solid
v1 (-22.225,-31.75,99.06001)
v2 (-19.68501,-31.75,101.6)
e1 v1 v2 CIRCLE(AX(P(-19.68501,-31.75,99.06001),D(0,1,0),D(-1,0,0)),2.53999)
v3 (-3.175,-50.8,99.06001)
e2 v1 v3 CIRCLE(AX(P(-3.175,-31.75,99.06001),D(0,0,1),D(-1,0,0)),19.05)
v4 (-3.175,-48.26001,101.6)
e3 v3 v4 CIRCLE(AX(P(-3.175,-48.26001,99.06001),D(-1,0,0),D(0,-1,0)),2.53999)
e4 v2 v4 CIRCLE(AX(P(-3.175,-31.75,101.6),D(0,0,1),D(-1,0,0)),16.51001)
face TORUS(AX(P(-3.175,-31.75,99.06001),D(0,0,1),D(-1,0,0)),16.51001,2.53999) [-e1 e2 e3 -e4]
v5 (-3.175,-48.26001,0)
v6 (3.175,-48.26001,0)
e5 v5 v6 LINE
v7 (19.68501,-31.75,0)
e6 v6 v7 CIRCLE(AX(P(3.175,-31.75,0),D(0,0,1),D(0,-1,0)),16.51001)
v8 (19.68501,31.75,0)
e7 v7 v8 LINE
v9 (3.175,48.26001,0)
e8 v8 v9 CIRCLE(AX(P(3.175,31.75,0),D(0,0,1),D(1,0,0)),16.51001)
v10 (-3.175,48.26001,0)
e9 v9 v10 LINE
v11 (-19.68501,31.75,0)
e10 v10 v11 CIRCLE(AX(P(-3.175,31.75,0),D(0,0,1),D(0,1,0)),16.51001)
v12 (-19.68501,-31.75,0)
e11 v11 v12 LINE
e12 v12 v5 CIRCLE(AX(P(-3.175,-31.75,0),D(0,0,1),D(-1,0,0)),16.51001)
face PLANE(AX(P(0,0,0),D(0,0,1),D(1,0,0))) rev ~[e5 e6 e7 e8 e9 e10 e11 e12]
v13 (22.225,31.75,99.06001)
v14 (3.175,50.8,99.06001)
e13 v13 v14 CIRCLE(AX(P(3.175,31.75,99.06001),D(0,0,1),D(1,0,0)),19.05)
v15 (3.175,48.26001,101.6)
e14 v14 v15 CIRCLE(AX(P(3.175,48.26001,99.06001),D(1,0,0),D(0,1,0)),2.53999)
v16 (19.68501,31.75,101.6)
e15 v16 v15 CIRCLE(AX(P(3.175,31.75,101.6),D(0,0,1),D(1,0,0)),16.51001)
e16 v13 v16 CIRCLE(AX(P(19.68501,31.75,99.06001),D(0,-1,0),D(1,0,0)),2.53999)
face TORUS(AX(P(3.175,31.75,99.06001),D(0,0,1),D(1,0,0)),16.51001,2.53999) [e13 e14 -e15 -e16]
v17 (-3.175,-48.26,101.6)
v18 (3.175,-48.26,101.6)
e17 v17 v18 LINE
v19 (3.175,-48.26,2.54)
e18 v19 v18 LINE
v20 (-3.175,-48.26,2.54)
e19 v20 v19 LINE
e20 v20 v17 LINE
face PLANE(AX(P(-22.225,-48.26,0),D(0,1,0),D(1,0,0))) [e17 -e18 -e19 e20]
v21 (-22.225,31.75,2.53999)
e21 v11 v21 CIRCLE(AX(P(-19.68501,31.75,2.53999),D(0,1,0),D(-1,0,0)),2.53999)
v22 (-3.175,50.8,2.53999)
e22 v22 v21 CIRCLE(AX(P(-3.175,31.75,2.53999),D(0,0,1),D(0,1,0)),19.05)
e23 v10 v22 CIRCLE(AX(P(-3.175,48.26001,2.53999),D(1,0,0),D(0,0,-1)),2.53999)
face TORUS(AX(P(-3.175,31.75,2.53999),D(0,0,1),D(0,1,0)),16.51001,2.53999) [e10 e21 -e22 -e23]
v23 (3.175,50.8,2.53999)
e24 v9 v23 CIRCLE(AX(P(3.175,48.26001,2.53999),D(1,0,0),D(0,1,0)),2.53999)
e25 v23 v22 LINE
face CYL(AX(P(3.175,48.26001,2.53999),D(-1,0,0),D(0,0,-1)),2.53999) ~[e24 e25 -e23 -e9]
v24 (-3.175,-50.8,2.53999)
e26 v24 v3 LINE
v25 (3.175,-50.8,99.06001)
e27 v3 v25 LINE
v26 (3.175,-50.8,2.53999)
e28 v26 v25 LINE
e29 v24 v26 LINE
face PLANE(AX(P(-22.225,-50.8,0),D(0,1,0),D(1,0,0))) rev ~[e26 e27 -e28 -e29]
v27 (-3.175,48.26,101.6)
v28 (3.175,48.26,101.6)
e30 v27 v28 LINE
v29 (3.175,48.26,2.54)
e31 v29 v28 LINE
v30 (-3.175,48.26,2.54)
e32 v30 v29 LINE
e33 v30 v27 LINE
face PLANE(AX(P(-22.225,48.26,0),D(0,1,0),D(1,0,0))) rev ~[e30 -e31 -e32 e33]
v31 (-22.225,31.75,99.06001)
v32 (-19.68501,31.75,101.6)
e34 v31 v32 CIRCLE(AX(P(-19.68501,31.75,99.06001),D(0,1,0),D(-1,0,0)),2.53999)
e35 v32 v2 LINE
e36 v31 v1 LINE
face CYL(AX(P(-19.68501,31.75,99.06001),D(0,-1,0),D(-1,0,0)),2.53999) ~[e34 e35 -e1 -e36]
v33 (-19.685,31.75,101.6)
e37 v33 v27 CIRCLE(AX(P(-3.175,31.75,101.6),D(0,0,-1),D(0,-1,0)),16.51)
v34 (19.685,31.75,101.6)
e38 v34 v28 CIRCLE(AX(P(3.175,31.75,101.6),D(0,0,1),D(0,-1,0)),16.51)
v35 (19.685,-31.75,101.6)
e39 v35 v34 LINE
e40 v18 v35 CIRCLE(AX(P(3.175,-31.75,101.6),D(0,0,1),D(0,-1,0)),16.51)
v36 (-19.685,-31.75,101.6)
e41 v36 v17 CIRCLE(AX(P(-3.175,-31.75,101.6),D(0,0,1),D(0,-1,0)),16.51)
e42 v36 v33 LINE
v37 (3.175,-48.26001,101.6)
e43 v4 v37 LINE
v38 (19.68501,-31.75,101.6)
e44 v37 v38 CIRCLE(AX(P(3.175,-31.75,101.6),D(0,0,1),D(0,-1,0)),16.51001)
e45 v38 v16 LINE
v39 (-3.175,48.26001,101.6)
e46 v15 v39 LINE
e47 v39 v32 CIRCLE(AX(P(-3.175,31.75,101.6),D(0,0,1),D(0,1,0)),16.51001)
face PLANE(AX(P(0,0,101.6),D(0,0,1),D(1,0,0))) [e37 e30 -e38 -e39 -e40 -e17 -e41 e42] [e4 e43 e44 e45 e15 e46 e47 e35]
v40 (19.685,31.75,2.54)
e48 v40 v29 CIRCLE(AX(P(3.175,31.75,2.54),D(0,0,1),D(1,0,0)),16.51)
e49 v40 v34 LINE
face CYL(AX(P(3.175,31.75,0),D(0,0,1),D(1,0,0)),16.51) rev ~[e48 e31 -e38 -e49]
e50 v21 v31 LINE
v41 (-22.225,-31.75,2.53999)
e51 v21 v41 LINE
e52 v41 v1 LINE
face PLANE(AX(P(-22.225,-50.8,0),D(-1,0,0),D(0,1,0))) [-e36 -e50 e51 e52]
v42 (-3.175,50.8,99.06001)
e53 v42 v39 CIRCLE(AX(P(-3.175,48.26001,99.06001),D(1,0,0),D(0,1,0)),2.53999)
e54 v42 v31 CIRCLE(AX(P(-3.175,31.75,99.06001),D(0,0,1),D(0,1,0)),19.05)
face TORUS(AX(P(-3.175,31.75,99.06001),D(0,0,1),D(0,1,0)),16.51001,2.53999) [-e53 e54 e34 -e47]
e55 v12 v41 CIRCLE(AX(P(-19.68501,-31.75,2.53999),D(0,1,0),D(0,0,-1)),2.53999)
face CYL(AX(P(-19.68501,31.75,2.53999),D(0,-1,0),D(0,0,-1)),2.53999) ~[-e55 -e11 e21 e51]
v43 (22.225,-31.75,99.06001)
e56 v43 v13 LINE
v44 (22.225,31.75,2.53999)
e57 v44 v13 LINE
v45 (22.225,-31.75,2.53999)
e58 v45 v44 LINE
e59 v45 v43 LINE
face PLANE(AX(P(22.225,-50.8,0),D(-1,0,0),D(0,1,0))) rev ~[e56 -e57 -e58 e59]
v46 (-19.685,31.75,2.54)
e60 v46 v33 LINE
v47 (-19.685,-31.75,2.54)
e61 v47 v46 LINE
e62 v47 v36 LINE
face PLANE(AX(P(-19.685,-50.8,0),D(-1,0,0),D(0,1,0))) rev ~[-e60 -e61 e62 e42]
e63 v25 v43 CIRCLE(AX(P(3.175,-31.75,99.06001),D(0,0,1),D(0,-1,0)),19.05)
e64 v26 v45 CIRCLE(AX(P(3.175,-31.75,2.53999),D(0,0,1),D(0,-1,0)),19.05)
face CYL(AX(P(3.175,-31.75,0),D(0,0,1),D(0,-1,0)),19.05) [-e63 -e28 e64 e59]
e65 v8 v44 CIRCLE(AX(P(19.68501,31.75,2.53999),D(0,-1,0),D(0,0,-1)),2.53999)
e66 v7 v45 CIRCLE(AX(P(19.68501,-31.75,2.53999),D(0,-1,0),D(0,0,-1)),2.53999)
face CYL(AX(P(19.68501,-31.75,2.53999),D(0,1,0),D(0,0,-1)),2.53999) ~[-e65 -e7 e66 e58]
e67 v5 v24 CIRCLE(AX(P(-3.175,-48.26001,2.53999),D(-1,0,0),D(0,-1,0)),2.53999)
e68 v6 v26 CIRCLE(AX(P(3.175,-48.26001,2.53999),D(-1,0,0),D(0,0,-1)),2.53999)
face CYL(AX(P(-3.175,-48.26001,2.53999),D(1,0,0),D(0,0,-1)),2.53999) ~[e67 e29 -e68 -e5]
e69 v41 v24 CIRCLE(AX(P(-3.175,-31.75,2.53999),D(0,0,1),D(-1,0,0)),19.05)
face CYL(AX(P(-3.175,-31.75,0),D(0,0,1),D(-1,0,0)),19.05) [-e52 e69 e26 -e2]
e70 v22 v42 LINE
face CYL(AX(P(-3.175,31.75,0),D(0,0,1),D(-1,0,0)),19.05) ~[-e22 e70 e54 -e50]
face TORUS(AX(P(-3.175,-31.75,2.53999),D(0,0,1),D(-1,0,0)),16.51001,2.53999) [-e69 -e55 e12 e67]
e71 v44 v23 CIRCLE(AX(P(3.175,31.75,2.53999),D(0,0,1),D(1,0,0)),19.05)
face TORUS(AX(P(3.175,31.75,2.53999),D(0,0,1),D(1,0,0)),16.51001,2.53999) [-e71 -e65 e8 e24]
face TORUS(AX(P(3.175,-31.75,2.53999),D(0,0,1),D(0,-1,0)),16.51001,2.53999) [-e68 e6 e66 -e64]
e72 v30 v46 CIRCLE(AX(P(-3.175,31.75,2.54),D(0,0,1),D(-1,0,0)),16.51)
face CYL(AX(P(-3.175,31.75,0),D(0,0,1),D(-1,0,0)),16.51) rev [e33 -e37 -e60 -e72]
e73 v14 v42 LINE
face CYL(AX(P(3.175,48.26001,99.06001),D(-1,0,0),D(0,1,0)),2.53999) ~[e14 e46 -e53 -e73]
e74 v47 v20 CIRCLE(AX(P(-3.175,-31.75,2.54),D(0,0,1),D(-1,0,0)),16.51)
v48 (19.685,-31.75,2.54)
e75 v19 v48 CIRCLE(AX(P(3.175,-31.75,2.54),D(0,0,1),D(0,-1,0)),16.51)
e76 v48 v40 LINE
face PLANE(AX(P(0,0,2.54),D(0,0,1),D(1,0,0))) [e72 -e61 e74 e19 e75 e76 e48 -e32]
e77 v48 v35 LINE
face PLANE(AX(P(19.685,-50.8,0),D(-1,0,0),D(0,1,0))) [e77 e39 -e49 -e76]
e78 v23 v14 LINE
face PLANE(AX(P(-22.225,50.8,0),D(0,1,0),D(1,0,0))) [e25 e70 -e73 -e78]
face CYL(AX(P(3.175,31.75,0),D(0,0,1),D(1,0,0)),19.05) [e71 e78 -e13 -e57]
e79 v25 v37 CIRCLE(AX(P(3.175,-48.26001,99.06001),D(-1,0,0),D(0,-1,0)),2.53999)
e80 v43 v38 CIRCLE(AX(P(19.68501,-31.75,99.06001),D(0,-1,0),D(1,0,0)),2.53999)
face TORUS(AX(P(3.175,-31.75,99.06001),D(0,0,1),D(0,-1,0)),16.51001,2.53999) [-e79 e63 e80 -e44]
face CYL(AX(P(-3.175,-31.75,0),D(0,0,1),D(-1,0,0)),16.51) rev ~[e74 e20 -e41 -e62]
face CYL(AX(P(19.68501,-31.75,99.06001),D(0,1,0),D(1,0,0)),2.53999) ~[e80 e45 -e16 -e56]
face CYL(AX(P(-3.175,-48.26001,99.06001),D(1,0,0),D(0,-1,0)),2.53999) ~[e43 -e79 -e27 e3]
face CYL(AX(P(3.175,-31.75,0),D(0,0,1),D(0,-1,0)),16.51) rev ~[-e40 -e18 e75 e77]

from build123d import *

# Parameters (mm, degrees)
F0_W     = 44.45
F0_H     = 101.6
F1_DEPTH = 101.6
F2_R     = 19.05
F3_T     = -2.54
F4_R     = 2.53999


# Not quite as in the source:
# - a fillet or chamfer is up to 0.001 mm smaller than in the source, because OpenCascade refuses the exact size


with BuildPart() as f1:
    # F0 (on Top) → F1 (new body)
    with BuildSketch(Plane.XY):
        Rectangle(F0_W, F0_H)
    extrude(amount=F1_DEPTH)

    # F2
    f2_edges = [f1.edges().sort_by_distance(p)[0] for p in [
        (-22.225, 50.8, 50.8),
        (-22.225, -50.8, 50.8),
        (22.225, -50.8, 50.8),
        (22.225, 50.8, 50.8),
    ]]
    fillet(f2_edges, radius=F2_R)

    # F3
    f3_openings = [f1.faces().sort_by_distance(p)[0] for p in [
        (0, 0, 101.6),
    ]]
    offset(amount=F3_T, openings=f3_openings)

    # F4 (radius 2.54 in the source; OpenCascade refuses exactly that, so slightly less here)
    f4_edges = [f1.edges().sort_by_distance(p)[0] for p in [
        (22.225, 0, 0),
        (22.225, -31.75, 50.8),
        (22.225, 31.75, 50.8),
        (22.225, 0, 101.6),
        (-22.225, 0, 0),
        (-22.225, 31.75, 50.8),
        (-22.225, -31.75, 50.8),
        (-22.225, 0, 101.6),
    ]]
    fillet(f4_edges, radius=F4_R)


solid = f1.part
